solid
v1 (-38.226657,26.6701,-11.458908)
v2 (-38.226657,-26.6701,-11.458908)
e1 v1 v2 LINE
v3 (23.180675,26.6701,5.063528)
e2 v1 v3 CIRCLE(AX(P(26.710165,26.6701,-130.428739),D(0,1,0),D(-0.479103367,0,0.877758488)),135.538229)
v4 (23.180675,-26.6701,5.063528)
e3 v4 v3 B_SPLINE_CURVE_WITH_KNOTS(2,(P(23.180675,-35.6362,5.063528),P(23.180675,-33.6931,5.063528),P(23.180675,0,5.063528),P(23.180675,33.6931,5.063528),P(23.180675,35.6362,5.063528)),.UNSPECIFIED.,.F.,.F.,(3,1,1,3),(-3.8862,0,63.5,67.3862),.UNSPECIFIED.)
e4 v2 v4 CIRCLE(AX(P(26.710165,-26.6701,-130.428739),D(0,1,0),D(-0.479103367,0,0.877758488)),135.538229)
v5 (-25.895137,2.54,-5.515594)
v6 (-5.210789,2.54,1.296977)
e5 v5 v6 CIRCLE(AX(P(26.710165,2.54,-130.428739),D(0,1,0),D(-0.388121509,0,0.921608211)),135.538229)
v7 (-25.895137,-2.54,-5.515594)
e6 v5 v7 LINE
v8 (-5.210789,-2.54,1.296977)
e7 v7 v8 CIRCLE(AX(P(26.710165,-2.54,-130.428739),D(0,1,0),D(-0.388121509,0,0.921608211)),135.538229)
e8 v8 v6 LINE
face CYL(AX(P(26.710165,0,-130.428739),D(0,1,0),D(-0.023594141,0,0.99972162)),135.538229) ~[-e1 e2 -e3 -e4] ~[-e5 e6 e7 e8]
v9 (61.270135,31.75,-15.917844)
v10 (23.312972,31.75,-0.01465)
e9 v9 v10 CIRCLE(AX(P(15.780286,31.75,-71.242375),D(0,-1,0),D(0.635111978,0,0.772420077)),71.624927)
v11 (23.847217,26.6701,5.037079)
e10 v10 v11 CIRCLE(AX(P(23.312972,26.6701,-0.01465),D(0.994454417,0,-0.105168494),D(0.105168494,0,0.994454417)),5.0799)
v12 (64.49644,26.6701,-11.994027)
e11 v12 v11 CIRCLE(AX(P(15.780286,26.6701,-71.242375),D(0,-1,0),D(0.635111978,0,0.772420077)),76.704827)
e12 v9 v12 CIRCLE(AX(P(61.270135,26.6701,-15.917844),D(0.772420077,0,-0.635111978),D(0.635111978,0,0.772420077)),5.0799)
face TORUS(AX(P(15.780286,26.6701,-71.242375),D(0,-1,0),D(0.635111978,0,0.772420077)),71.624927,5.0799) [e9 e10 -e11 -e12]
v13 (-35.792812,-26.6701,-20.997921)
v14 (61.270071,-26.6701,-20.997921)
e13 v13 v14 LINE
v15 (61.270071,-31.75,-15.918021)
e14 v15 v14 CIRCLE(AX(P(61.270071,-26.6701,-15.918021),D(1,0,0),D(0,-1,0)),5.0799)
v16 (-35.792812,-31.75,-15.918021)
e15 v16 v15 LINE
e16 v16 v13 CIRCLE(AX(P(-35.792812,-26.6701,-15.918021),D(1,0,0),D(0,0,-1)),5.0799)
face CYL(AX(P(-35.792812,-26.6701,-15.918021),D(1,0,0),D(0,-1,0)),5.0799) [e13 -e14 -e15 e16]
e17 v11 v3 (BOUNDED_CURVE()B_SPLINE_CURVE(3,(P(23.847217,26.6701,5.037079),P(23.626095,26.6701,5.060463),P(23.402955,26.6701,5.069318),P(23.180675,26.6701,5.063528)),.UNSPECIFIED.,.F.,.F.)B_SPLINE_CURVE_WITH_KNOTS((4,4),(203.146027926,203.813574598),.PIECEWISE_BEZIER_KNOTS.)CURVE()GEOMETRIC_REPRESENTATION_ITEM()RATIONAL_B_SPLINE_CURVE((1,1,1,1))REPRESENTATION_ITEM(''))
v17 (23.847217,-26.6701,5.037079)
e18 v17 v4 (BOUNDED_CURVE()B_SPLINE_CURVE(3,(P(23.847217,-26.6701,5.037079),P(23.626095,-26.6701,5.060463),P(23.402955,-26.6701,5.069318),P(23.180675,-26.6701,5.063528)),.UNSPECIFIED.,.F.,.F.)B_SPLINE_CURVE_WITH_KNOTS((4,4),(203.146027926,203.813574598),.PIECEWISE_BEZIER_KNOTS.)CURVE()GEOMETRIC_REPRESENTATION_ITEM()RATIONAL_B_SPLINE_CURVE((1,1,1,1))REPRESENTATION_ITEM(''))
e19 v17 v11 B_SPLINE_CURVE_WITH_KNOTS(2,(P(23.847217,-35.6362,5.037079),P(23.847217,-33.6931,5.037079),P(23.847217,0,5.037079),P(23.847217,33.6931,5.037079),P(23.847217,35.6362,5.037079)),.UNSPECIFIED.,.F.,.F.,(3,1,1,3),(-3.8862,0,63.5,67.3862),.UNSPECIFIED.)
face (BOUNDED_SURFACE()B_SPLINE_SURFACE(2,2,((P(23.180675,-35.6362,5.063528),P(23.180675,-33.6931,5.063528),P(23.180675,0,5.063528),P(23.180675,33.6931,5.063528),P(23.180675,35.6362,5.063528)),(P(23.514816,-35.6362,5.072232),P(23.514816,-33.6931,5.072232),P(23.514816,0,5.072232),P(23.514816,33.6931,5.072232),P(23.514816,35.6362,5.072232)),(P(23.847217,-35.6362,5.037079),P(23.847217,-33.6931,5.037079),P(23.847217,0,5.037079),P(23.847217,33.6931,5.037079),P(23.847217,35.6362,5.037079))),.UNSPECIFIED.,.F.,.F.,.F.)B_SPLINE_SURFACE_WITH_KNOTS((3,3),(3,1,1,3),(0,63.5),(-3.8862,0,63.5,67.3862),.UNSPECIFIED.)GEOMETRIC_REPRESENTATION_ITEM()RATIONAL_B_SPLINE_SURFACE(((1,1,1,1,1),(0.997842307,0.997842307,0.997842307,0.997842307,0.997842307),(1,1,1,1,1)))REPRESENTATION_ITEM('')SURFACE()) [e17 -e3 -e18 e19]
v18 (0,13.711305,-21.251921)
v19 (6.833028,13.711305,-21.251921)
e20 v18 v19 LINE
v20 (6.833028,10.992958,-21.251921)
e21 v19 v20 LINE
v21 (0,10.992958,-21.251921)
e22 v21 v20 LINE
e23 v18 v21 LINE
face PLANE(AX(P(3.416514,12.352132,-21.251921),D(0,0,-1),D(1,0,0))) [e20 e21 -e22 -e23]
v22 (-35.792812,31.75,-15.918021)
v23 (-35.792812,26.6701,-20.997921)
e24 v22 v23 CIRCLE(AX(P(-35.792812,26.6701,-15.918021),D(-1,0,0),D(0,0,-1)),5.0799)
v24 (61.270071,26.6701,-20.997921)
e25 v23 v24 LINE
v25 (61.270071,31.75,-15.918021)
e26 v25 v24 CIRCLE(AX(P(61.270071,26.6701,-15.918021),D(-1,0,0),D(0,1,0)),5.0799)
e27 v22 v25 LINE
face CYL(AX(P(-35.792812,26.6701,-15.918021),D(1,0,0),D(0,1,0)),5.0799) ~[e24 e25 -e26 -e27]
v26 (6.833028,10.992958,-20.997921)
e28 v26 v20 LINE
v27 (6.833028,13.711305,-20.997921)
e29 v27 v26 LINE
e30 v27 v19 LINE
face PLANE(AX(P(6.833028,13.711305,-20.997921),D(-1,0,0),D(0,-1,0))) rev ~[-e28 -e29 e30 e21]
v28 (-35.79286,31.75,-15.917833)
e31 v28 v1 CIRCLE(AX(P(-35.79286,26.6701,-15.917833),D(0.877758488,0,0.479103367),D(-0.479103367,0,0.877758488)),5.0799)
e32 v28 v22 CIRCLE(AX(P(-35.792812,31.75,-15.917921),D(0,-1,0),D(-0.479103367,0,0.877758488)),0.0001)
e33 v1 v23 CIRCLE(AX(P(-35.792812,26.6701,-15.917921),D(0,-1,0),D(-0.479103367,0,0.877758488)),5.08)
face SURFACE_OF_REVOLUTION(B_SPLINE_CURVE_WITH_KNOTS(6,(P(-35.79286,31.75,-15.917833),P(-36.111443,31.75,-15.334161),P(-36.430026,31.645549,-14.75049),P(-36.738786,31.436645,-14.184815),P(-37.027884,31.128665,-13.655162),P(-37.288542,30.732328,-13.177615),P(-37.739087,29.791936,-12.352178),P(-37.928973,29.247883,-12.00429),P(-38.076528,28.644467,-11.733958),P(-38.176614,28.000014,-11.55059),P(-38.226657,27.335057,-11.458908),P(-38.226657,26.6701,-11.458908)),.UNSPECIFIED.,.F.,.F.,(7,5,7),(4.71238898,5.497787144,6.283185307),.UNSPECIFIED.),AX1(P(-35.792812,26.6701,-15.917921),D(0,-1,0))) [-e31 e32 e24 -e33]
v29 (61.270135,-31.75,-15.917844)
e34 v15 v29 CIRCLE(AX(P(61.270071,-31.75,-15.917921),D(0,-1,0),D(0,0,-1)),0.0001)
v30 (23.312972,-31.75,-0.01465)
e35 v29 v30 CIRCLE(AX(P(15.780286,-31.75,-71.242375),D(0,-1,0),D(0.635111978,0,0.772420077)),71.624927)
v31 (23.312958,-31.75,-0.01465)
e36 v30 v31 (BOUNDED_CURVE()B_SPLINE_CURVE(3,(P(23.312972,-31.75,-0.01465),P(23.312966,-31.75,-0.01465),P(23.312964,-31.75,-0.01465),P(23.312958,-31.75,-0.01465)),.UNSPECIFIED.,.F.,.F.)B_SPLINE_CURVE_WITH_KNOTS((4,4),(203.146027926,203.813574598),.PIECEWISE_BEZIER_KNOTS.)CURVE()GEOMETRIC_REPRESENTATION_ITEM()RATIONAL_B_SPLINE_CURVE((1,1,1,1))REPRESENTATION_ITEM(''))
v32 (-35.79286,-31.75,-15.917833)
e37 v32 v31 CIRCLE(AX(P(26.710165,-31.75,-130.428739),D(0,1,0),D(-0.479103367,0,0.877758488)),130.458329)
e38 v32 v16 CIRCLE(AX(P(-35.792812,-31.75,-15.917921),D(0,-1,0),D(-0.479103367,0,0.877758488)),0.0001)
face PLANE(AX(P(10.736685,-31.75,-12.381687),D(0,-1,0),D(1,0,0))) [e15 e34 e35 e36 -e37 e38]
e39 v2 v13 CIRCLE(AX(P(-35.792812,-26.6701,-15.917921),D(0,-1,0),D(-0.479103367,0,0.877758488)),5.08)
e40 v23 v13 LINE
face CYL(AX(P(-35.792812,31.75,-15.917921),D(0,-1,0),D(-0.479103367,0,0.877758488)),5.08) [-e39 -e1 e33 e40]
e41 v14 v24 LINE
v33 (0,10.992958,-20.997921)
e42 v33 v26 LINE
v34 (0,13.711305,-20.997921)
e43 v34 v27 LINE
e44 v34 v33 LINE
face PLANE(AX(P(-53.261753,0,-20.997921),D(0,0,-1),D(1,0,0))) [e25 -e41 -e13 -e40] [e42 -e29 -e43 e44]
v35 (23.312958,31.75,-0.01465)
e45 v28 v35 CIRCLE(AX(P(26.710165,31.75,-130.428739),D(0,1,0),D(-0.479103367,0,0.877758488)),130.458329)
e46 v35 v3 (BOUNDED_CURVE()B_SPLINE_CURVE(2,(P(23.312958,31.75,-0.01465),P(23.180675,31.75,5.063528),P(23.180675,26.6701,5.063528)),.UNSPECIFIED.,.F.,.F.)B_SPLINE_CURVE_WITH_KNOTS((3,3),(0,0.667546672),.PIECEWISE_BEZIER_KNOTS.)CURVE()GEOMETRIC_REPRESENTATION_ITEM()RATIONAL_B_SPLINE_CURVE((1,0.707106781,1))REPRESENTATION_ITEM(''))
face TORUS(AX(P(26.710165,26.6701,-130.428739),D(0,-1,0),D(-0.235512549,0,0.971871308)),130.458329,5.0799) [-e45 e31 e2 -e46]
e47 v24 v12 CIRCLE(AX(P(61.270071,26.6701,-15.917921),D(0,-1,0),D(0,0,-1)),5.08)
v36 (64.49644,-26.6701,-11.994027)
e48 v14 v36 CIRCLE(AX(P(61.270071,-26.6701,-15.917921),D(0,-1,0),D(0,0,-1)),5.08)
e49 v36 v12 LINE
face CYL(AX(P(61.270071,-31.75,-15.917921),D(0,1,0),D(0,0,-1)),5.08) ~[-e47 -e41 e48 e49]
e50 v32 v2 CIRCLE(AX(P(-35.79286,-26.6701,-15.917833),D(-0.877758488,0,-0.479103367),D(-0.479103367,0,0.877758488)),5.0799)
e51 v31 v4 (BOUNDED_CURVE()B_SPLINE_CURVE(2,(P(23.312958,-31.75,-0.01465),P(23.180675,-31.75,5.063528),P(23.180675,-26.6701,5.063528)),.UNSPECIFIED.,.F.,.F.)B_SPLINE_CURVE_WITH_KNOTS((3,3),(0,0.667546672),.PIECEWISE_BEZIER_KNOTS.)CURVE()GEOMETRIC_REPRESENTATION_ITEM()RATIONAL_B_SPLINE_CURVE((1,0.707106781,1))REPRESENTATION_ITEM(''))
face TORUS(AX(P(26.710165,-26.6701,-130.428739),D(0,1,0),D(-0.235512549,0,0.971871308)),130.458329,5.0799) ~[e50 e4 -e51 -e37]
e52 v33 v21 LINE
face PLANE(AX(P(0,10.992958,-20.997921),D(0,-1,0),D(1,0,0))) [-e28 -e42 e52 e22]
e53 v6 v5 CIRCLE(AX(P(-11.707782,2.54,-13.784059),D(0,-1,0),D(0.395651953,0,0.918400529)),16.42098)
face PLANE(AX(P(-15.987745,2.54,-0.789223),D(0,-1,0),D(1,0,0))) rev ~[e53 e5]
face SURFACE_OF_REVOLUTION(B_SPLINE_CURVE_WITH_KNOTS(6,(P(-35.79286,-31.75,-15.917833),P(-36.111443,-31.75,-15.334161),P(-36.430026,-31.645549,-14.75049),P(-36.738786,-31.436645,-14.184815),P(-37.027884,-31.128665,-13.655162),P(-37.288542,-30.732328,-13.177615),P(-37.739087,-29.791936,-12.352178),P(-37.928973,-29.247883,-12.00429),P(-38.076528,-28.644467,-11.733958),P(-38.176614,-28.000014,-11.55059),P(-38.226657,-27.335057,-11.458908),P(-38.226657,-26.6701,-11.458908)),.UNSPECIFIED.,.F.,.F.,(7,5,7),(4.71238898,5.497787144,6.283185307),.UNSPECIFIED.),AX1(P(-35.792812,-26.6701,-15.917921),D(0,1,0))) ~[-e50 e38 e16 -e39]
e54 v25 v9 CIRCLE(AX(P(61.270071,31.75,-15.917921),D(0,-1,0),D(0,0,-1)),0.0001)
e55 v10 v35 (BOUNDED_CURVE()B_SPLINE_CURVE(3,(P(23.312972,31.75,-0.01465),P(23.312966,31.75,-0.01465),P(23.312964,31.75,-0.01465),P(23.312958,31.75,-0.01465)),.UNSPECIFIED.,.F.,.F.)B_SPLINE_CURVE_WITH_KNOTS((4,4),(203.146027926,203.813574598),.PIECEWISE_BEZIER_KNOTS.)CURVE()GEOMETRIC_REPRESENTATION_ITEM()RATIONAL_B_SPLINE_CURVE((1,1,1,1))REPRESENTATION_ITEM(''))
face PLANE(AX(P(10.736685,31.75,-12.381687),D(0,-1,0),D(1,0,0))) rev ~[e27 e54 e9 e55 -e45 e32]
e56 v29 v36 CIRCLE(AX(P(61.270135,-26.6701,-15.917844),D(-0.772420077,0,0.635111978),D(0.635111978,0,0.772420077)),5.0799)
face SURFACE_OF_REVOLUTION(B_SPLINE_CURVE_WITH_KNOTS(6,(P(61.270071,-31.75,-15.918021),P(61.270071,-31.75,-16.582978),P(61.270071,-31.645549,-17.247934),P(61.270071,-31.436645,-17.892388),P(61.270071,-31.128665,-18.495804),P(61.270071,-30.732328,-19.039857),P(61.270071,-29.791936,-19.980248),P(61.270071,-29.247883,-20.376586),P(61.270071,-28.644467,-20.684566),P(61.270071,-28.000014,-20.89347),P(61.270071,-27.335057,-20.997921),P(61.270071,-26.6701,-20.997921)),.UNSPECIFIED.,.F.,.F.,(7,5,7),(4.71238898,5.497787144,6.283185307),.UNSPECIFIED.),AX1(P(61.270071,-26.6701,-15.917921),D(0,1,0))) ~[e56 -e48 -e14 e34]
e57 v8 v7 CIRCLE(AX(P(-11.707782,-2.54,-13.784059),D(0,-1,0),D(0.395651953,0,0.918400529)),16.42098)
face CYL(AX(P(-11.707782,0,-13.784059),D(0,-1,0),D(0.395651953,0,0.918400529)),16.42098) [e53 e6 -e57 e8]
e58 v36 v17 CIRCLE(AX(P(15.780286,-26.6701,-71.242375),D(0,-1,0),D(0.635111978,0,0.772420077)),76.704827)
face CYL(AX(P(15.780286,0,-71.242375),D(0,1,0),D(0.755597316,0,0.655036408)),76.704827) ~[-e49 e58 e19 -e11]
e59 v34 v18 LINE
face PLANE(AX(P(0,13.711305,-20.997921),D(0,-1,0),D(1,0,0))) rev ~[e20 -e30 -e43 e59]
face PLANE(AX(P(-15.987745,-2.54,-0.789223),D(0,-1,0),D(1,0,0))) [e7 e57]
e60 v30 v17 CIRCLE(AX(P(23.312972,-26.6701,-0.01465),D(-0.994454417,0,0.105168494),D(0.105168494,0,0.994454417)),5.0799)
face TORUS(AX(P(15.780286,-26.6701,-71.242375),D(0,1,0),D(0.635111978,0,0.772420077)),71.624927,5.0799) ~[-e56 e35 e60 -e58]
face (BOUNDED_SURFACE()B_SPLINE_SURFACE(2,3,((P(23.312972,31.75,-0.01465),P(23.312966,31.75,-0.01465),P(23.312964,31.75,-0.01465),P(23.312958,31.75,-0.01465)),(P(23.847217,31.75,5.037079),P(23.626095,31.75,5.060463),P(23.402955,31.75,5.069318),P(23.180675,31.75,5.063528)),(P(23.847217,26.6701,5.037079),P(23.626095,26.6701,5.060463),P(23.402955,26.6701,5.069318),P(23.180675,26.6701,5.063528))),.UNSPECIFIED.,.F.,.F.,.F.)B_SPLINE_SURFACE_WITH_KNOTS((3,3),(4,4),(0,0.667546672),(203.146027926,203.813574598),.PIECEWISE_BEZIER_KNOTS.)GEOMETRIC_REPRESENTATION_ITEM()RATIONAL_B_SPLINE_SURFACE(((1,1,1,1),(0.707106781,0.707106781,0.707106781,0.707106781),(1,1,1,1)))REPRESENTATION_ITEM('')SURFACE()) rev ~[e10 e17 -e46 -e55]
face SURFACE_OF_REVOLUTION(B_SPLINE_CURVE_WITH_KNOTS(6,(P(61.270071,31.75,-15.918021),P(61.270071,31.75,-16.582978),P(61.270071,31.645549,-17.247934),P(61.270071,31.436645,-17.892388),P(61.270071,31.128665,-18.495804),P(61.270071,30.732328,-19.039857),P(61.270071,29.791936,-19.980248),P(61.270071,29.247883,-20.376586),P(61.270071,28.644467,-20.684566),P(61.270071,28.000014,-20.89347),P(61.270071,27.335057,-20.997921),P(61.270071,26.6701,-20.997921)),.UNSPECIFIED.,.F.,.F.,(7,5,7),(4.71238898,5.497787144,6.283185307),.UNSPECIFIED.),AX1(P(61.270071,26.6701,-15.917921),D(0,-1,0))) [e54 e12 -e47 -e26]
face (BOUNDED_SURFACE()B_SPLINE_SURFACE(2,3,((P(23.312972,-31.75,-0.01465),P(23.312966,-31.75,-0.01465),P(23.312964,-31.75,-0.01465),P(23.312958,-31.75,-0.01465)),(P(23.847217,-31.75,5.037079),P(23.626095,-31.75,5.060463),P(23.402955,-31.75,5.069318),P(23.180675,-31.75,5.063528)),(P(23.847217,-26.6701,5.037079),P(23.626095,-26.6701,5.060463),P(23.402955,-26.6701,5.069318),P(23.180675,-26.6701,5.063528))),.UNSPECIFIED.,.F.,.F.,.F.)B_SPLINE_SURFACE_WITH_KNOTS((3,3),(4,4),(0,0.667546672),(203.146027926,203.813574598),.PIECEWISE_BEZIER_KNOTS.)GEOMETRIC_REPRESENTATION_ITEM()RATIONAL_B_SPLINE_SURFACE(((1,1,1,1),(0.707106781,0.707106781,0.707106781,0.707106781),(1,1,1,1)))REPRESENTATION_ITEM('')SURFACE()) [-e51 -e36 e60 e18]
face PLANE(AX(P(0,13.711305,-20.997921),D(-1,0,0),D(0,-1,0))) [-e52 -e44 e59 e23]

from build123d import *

# Parameters (mm, degrees)
F1_DEPTH      = 31.75
F1_DEPTH_BACK = 31.75
F2_DEPTH      = 2.54
F2_DEPTH_BACK = 2.54
F3_F1_R       = 5.08
F3_F2_R       = 5.08
F3_F3_R       = 5.08
F3_F4_R       = 5.0799
F3_F5_R       = 5.0799
F5_W          = 6.8330275826
F5_H          = 2.7183471248
F6_DEPTH      = 0.254


# Not quite as in the source:
# - a fillet or chamfer is up to 0.001 mm smaller than in the source, because OpenCascade refuses the exact size


with BuildPart() as f1:
    # F0 (on Front) → F1 (new body, two sides)
    with BuildSketch(Plane.XZ) as f1_sk:
        with BuildLine():
            ThreePointArc((-25.8951373398, -5.5155940354), (-40.0289198751, -12.4604967705), (-53.2617530078, -20.9979208572))
            Line((-53.2617530078, -20.9979208572), (73.7382469922, -20.9979208572))
            ThreePointArc((73.7382469922, -20.9979208572), (51.1172189887, -3.1620431242), (23.5122566854, 5.0717590762))
            ThreePointArc((23.5122566854, 5.0717590762), (9.0495911456, 3.953982117), (-5.2107890931, 1.2969771686))
            ThreePointArc((-5.2107890931, 1.2969771686), (-15.6900093901, -1.6932084475), (-25.8951373398, -5.5155940354))
        make_face()
    extrude(amount=F1_DEPTH)
    extrude(f1_sk.sketch, amount=-F1_DEPTH_BACK)

    # F0 (on Front) → F2 (join, two sides)
    with BuildSketch(Plane.XZ) as f2_sk:
        with BuildLine():
            ThreePointArc((-5.2107890931, 1.2969771686), (-16.8447265846, 1.8127472133), (-25.8951373398, -5.5155940354))
            ThreePointArc((-25.8951373398, -5.5155940354), (-15.6900093901, -1.6932084475), (-5.2107890931, 1.2969771686))
        make_face()
    extrude(amount=F2_DEPTH)
    extrude(f2_sk.sketch, amount=-F2_DEPTH_BACK)

    # F3: fillet of radius 5.08 on 9 edges, made by hand

    # F3_f1
    f3_f1_edges = [f1.edges().sort_by_distance(p)[0] for p in [
        (73.7382469922, 0, -20.9979208572),
    ]]
    fillet(f3_f1_edges, radius=F3_F1_R)

    # F3_f2
    f3_f2_edges = [f1.edges().sort_by_distance(p)[0] for p in [
        (23.5122566854, 0, 5.0717590762),
    ]]
    fillet(f3_f2_edges, radius=F3_F2_R)

    # F3_f3
    f3_f3_edges = [f1.edges().sort_by_distance(p)[0] for p in [
        (-53.2617530078, 0, -20.9979208572),
    ]]
    fillet(f3_f3_edges, radius=F3_F3_R)

    # F3_f4 (radius 5.08 in the source; OpenCascade refuses exactly that, so slightly less here)
    f3_f4_edges = [f1.edges().sort_by_distance(p)[0] for p in [
        (-8.5056935283, 31.75, 0.4546248012),
    ]]
    fillet(f3_f4_edges, radius=F3_F4_R)

    # F3_f5 (radius 5.08 in the source; OpenCascade refuses exactly that, so slightly less here)
    f3_f5_edges = [f1.edges().sort_by_distance(p)[0] for p in [
        (-8.5056935283, -31.75, 0.4546248012),
    ]]
    fillet(f3_f5_edges, radius=F3_F5_R)

    # F5 (on face) → F6 (join)
    with BuildSketch(Plane(origin=(0, 0, -20.9979208572), x_dir=(1, 0, 0), z_dir=(0, 0, -1))):
        with Locations((3.4165137913, -12.3521317728)):
            Rectangle(F5_W, F5_H)
    extrude(amount=F6_DEPTH)


solid = f1.part
